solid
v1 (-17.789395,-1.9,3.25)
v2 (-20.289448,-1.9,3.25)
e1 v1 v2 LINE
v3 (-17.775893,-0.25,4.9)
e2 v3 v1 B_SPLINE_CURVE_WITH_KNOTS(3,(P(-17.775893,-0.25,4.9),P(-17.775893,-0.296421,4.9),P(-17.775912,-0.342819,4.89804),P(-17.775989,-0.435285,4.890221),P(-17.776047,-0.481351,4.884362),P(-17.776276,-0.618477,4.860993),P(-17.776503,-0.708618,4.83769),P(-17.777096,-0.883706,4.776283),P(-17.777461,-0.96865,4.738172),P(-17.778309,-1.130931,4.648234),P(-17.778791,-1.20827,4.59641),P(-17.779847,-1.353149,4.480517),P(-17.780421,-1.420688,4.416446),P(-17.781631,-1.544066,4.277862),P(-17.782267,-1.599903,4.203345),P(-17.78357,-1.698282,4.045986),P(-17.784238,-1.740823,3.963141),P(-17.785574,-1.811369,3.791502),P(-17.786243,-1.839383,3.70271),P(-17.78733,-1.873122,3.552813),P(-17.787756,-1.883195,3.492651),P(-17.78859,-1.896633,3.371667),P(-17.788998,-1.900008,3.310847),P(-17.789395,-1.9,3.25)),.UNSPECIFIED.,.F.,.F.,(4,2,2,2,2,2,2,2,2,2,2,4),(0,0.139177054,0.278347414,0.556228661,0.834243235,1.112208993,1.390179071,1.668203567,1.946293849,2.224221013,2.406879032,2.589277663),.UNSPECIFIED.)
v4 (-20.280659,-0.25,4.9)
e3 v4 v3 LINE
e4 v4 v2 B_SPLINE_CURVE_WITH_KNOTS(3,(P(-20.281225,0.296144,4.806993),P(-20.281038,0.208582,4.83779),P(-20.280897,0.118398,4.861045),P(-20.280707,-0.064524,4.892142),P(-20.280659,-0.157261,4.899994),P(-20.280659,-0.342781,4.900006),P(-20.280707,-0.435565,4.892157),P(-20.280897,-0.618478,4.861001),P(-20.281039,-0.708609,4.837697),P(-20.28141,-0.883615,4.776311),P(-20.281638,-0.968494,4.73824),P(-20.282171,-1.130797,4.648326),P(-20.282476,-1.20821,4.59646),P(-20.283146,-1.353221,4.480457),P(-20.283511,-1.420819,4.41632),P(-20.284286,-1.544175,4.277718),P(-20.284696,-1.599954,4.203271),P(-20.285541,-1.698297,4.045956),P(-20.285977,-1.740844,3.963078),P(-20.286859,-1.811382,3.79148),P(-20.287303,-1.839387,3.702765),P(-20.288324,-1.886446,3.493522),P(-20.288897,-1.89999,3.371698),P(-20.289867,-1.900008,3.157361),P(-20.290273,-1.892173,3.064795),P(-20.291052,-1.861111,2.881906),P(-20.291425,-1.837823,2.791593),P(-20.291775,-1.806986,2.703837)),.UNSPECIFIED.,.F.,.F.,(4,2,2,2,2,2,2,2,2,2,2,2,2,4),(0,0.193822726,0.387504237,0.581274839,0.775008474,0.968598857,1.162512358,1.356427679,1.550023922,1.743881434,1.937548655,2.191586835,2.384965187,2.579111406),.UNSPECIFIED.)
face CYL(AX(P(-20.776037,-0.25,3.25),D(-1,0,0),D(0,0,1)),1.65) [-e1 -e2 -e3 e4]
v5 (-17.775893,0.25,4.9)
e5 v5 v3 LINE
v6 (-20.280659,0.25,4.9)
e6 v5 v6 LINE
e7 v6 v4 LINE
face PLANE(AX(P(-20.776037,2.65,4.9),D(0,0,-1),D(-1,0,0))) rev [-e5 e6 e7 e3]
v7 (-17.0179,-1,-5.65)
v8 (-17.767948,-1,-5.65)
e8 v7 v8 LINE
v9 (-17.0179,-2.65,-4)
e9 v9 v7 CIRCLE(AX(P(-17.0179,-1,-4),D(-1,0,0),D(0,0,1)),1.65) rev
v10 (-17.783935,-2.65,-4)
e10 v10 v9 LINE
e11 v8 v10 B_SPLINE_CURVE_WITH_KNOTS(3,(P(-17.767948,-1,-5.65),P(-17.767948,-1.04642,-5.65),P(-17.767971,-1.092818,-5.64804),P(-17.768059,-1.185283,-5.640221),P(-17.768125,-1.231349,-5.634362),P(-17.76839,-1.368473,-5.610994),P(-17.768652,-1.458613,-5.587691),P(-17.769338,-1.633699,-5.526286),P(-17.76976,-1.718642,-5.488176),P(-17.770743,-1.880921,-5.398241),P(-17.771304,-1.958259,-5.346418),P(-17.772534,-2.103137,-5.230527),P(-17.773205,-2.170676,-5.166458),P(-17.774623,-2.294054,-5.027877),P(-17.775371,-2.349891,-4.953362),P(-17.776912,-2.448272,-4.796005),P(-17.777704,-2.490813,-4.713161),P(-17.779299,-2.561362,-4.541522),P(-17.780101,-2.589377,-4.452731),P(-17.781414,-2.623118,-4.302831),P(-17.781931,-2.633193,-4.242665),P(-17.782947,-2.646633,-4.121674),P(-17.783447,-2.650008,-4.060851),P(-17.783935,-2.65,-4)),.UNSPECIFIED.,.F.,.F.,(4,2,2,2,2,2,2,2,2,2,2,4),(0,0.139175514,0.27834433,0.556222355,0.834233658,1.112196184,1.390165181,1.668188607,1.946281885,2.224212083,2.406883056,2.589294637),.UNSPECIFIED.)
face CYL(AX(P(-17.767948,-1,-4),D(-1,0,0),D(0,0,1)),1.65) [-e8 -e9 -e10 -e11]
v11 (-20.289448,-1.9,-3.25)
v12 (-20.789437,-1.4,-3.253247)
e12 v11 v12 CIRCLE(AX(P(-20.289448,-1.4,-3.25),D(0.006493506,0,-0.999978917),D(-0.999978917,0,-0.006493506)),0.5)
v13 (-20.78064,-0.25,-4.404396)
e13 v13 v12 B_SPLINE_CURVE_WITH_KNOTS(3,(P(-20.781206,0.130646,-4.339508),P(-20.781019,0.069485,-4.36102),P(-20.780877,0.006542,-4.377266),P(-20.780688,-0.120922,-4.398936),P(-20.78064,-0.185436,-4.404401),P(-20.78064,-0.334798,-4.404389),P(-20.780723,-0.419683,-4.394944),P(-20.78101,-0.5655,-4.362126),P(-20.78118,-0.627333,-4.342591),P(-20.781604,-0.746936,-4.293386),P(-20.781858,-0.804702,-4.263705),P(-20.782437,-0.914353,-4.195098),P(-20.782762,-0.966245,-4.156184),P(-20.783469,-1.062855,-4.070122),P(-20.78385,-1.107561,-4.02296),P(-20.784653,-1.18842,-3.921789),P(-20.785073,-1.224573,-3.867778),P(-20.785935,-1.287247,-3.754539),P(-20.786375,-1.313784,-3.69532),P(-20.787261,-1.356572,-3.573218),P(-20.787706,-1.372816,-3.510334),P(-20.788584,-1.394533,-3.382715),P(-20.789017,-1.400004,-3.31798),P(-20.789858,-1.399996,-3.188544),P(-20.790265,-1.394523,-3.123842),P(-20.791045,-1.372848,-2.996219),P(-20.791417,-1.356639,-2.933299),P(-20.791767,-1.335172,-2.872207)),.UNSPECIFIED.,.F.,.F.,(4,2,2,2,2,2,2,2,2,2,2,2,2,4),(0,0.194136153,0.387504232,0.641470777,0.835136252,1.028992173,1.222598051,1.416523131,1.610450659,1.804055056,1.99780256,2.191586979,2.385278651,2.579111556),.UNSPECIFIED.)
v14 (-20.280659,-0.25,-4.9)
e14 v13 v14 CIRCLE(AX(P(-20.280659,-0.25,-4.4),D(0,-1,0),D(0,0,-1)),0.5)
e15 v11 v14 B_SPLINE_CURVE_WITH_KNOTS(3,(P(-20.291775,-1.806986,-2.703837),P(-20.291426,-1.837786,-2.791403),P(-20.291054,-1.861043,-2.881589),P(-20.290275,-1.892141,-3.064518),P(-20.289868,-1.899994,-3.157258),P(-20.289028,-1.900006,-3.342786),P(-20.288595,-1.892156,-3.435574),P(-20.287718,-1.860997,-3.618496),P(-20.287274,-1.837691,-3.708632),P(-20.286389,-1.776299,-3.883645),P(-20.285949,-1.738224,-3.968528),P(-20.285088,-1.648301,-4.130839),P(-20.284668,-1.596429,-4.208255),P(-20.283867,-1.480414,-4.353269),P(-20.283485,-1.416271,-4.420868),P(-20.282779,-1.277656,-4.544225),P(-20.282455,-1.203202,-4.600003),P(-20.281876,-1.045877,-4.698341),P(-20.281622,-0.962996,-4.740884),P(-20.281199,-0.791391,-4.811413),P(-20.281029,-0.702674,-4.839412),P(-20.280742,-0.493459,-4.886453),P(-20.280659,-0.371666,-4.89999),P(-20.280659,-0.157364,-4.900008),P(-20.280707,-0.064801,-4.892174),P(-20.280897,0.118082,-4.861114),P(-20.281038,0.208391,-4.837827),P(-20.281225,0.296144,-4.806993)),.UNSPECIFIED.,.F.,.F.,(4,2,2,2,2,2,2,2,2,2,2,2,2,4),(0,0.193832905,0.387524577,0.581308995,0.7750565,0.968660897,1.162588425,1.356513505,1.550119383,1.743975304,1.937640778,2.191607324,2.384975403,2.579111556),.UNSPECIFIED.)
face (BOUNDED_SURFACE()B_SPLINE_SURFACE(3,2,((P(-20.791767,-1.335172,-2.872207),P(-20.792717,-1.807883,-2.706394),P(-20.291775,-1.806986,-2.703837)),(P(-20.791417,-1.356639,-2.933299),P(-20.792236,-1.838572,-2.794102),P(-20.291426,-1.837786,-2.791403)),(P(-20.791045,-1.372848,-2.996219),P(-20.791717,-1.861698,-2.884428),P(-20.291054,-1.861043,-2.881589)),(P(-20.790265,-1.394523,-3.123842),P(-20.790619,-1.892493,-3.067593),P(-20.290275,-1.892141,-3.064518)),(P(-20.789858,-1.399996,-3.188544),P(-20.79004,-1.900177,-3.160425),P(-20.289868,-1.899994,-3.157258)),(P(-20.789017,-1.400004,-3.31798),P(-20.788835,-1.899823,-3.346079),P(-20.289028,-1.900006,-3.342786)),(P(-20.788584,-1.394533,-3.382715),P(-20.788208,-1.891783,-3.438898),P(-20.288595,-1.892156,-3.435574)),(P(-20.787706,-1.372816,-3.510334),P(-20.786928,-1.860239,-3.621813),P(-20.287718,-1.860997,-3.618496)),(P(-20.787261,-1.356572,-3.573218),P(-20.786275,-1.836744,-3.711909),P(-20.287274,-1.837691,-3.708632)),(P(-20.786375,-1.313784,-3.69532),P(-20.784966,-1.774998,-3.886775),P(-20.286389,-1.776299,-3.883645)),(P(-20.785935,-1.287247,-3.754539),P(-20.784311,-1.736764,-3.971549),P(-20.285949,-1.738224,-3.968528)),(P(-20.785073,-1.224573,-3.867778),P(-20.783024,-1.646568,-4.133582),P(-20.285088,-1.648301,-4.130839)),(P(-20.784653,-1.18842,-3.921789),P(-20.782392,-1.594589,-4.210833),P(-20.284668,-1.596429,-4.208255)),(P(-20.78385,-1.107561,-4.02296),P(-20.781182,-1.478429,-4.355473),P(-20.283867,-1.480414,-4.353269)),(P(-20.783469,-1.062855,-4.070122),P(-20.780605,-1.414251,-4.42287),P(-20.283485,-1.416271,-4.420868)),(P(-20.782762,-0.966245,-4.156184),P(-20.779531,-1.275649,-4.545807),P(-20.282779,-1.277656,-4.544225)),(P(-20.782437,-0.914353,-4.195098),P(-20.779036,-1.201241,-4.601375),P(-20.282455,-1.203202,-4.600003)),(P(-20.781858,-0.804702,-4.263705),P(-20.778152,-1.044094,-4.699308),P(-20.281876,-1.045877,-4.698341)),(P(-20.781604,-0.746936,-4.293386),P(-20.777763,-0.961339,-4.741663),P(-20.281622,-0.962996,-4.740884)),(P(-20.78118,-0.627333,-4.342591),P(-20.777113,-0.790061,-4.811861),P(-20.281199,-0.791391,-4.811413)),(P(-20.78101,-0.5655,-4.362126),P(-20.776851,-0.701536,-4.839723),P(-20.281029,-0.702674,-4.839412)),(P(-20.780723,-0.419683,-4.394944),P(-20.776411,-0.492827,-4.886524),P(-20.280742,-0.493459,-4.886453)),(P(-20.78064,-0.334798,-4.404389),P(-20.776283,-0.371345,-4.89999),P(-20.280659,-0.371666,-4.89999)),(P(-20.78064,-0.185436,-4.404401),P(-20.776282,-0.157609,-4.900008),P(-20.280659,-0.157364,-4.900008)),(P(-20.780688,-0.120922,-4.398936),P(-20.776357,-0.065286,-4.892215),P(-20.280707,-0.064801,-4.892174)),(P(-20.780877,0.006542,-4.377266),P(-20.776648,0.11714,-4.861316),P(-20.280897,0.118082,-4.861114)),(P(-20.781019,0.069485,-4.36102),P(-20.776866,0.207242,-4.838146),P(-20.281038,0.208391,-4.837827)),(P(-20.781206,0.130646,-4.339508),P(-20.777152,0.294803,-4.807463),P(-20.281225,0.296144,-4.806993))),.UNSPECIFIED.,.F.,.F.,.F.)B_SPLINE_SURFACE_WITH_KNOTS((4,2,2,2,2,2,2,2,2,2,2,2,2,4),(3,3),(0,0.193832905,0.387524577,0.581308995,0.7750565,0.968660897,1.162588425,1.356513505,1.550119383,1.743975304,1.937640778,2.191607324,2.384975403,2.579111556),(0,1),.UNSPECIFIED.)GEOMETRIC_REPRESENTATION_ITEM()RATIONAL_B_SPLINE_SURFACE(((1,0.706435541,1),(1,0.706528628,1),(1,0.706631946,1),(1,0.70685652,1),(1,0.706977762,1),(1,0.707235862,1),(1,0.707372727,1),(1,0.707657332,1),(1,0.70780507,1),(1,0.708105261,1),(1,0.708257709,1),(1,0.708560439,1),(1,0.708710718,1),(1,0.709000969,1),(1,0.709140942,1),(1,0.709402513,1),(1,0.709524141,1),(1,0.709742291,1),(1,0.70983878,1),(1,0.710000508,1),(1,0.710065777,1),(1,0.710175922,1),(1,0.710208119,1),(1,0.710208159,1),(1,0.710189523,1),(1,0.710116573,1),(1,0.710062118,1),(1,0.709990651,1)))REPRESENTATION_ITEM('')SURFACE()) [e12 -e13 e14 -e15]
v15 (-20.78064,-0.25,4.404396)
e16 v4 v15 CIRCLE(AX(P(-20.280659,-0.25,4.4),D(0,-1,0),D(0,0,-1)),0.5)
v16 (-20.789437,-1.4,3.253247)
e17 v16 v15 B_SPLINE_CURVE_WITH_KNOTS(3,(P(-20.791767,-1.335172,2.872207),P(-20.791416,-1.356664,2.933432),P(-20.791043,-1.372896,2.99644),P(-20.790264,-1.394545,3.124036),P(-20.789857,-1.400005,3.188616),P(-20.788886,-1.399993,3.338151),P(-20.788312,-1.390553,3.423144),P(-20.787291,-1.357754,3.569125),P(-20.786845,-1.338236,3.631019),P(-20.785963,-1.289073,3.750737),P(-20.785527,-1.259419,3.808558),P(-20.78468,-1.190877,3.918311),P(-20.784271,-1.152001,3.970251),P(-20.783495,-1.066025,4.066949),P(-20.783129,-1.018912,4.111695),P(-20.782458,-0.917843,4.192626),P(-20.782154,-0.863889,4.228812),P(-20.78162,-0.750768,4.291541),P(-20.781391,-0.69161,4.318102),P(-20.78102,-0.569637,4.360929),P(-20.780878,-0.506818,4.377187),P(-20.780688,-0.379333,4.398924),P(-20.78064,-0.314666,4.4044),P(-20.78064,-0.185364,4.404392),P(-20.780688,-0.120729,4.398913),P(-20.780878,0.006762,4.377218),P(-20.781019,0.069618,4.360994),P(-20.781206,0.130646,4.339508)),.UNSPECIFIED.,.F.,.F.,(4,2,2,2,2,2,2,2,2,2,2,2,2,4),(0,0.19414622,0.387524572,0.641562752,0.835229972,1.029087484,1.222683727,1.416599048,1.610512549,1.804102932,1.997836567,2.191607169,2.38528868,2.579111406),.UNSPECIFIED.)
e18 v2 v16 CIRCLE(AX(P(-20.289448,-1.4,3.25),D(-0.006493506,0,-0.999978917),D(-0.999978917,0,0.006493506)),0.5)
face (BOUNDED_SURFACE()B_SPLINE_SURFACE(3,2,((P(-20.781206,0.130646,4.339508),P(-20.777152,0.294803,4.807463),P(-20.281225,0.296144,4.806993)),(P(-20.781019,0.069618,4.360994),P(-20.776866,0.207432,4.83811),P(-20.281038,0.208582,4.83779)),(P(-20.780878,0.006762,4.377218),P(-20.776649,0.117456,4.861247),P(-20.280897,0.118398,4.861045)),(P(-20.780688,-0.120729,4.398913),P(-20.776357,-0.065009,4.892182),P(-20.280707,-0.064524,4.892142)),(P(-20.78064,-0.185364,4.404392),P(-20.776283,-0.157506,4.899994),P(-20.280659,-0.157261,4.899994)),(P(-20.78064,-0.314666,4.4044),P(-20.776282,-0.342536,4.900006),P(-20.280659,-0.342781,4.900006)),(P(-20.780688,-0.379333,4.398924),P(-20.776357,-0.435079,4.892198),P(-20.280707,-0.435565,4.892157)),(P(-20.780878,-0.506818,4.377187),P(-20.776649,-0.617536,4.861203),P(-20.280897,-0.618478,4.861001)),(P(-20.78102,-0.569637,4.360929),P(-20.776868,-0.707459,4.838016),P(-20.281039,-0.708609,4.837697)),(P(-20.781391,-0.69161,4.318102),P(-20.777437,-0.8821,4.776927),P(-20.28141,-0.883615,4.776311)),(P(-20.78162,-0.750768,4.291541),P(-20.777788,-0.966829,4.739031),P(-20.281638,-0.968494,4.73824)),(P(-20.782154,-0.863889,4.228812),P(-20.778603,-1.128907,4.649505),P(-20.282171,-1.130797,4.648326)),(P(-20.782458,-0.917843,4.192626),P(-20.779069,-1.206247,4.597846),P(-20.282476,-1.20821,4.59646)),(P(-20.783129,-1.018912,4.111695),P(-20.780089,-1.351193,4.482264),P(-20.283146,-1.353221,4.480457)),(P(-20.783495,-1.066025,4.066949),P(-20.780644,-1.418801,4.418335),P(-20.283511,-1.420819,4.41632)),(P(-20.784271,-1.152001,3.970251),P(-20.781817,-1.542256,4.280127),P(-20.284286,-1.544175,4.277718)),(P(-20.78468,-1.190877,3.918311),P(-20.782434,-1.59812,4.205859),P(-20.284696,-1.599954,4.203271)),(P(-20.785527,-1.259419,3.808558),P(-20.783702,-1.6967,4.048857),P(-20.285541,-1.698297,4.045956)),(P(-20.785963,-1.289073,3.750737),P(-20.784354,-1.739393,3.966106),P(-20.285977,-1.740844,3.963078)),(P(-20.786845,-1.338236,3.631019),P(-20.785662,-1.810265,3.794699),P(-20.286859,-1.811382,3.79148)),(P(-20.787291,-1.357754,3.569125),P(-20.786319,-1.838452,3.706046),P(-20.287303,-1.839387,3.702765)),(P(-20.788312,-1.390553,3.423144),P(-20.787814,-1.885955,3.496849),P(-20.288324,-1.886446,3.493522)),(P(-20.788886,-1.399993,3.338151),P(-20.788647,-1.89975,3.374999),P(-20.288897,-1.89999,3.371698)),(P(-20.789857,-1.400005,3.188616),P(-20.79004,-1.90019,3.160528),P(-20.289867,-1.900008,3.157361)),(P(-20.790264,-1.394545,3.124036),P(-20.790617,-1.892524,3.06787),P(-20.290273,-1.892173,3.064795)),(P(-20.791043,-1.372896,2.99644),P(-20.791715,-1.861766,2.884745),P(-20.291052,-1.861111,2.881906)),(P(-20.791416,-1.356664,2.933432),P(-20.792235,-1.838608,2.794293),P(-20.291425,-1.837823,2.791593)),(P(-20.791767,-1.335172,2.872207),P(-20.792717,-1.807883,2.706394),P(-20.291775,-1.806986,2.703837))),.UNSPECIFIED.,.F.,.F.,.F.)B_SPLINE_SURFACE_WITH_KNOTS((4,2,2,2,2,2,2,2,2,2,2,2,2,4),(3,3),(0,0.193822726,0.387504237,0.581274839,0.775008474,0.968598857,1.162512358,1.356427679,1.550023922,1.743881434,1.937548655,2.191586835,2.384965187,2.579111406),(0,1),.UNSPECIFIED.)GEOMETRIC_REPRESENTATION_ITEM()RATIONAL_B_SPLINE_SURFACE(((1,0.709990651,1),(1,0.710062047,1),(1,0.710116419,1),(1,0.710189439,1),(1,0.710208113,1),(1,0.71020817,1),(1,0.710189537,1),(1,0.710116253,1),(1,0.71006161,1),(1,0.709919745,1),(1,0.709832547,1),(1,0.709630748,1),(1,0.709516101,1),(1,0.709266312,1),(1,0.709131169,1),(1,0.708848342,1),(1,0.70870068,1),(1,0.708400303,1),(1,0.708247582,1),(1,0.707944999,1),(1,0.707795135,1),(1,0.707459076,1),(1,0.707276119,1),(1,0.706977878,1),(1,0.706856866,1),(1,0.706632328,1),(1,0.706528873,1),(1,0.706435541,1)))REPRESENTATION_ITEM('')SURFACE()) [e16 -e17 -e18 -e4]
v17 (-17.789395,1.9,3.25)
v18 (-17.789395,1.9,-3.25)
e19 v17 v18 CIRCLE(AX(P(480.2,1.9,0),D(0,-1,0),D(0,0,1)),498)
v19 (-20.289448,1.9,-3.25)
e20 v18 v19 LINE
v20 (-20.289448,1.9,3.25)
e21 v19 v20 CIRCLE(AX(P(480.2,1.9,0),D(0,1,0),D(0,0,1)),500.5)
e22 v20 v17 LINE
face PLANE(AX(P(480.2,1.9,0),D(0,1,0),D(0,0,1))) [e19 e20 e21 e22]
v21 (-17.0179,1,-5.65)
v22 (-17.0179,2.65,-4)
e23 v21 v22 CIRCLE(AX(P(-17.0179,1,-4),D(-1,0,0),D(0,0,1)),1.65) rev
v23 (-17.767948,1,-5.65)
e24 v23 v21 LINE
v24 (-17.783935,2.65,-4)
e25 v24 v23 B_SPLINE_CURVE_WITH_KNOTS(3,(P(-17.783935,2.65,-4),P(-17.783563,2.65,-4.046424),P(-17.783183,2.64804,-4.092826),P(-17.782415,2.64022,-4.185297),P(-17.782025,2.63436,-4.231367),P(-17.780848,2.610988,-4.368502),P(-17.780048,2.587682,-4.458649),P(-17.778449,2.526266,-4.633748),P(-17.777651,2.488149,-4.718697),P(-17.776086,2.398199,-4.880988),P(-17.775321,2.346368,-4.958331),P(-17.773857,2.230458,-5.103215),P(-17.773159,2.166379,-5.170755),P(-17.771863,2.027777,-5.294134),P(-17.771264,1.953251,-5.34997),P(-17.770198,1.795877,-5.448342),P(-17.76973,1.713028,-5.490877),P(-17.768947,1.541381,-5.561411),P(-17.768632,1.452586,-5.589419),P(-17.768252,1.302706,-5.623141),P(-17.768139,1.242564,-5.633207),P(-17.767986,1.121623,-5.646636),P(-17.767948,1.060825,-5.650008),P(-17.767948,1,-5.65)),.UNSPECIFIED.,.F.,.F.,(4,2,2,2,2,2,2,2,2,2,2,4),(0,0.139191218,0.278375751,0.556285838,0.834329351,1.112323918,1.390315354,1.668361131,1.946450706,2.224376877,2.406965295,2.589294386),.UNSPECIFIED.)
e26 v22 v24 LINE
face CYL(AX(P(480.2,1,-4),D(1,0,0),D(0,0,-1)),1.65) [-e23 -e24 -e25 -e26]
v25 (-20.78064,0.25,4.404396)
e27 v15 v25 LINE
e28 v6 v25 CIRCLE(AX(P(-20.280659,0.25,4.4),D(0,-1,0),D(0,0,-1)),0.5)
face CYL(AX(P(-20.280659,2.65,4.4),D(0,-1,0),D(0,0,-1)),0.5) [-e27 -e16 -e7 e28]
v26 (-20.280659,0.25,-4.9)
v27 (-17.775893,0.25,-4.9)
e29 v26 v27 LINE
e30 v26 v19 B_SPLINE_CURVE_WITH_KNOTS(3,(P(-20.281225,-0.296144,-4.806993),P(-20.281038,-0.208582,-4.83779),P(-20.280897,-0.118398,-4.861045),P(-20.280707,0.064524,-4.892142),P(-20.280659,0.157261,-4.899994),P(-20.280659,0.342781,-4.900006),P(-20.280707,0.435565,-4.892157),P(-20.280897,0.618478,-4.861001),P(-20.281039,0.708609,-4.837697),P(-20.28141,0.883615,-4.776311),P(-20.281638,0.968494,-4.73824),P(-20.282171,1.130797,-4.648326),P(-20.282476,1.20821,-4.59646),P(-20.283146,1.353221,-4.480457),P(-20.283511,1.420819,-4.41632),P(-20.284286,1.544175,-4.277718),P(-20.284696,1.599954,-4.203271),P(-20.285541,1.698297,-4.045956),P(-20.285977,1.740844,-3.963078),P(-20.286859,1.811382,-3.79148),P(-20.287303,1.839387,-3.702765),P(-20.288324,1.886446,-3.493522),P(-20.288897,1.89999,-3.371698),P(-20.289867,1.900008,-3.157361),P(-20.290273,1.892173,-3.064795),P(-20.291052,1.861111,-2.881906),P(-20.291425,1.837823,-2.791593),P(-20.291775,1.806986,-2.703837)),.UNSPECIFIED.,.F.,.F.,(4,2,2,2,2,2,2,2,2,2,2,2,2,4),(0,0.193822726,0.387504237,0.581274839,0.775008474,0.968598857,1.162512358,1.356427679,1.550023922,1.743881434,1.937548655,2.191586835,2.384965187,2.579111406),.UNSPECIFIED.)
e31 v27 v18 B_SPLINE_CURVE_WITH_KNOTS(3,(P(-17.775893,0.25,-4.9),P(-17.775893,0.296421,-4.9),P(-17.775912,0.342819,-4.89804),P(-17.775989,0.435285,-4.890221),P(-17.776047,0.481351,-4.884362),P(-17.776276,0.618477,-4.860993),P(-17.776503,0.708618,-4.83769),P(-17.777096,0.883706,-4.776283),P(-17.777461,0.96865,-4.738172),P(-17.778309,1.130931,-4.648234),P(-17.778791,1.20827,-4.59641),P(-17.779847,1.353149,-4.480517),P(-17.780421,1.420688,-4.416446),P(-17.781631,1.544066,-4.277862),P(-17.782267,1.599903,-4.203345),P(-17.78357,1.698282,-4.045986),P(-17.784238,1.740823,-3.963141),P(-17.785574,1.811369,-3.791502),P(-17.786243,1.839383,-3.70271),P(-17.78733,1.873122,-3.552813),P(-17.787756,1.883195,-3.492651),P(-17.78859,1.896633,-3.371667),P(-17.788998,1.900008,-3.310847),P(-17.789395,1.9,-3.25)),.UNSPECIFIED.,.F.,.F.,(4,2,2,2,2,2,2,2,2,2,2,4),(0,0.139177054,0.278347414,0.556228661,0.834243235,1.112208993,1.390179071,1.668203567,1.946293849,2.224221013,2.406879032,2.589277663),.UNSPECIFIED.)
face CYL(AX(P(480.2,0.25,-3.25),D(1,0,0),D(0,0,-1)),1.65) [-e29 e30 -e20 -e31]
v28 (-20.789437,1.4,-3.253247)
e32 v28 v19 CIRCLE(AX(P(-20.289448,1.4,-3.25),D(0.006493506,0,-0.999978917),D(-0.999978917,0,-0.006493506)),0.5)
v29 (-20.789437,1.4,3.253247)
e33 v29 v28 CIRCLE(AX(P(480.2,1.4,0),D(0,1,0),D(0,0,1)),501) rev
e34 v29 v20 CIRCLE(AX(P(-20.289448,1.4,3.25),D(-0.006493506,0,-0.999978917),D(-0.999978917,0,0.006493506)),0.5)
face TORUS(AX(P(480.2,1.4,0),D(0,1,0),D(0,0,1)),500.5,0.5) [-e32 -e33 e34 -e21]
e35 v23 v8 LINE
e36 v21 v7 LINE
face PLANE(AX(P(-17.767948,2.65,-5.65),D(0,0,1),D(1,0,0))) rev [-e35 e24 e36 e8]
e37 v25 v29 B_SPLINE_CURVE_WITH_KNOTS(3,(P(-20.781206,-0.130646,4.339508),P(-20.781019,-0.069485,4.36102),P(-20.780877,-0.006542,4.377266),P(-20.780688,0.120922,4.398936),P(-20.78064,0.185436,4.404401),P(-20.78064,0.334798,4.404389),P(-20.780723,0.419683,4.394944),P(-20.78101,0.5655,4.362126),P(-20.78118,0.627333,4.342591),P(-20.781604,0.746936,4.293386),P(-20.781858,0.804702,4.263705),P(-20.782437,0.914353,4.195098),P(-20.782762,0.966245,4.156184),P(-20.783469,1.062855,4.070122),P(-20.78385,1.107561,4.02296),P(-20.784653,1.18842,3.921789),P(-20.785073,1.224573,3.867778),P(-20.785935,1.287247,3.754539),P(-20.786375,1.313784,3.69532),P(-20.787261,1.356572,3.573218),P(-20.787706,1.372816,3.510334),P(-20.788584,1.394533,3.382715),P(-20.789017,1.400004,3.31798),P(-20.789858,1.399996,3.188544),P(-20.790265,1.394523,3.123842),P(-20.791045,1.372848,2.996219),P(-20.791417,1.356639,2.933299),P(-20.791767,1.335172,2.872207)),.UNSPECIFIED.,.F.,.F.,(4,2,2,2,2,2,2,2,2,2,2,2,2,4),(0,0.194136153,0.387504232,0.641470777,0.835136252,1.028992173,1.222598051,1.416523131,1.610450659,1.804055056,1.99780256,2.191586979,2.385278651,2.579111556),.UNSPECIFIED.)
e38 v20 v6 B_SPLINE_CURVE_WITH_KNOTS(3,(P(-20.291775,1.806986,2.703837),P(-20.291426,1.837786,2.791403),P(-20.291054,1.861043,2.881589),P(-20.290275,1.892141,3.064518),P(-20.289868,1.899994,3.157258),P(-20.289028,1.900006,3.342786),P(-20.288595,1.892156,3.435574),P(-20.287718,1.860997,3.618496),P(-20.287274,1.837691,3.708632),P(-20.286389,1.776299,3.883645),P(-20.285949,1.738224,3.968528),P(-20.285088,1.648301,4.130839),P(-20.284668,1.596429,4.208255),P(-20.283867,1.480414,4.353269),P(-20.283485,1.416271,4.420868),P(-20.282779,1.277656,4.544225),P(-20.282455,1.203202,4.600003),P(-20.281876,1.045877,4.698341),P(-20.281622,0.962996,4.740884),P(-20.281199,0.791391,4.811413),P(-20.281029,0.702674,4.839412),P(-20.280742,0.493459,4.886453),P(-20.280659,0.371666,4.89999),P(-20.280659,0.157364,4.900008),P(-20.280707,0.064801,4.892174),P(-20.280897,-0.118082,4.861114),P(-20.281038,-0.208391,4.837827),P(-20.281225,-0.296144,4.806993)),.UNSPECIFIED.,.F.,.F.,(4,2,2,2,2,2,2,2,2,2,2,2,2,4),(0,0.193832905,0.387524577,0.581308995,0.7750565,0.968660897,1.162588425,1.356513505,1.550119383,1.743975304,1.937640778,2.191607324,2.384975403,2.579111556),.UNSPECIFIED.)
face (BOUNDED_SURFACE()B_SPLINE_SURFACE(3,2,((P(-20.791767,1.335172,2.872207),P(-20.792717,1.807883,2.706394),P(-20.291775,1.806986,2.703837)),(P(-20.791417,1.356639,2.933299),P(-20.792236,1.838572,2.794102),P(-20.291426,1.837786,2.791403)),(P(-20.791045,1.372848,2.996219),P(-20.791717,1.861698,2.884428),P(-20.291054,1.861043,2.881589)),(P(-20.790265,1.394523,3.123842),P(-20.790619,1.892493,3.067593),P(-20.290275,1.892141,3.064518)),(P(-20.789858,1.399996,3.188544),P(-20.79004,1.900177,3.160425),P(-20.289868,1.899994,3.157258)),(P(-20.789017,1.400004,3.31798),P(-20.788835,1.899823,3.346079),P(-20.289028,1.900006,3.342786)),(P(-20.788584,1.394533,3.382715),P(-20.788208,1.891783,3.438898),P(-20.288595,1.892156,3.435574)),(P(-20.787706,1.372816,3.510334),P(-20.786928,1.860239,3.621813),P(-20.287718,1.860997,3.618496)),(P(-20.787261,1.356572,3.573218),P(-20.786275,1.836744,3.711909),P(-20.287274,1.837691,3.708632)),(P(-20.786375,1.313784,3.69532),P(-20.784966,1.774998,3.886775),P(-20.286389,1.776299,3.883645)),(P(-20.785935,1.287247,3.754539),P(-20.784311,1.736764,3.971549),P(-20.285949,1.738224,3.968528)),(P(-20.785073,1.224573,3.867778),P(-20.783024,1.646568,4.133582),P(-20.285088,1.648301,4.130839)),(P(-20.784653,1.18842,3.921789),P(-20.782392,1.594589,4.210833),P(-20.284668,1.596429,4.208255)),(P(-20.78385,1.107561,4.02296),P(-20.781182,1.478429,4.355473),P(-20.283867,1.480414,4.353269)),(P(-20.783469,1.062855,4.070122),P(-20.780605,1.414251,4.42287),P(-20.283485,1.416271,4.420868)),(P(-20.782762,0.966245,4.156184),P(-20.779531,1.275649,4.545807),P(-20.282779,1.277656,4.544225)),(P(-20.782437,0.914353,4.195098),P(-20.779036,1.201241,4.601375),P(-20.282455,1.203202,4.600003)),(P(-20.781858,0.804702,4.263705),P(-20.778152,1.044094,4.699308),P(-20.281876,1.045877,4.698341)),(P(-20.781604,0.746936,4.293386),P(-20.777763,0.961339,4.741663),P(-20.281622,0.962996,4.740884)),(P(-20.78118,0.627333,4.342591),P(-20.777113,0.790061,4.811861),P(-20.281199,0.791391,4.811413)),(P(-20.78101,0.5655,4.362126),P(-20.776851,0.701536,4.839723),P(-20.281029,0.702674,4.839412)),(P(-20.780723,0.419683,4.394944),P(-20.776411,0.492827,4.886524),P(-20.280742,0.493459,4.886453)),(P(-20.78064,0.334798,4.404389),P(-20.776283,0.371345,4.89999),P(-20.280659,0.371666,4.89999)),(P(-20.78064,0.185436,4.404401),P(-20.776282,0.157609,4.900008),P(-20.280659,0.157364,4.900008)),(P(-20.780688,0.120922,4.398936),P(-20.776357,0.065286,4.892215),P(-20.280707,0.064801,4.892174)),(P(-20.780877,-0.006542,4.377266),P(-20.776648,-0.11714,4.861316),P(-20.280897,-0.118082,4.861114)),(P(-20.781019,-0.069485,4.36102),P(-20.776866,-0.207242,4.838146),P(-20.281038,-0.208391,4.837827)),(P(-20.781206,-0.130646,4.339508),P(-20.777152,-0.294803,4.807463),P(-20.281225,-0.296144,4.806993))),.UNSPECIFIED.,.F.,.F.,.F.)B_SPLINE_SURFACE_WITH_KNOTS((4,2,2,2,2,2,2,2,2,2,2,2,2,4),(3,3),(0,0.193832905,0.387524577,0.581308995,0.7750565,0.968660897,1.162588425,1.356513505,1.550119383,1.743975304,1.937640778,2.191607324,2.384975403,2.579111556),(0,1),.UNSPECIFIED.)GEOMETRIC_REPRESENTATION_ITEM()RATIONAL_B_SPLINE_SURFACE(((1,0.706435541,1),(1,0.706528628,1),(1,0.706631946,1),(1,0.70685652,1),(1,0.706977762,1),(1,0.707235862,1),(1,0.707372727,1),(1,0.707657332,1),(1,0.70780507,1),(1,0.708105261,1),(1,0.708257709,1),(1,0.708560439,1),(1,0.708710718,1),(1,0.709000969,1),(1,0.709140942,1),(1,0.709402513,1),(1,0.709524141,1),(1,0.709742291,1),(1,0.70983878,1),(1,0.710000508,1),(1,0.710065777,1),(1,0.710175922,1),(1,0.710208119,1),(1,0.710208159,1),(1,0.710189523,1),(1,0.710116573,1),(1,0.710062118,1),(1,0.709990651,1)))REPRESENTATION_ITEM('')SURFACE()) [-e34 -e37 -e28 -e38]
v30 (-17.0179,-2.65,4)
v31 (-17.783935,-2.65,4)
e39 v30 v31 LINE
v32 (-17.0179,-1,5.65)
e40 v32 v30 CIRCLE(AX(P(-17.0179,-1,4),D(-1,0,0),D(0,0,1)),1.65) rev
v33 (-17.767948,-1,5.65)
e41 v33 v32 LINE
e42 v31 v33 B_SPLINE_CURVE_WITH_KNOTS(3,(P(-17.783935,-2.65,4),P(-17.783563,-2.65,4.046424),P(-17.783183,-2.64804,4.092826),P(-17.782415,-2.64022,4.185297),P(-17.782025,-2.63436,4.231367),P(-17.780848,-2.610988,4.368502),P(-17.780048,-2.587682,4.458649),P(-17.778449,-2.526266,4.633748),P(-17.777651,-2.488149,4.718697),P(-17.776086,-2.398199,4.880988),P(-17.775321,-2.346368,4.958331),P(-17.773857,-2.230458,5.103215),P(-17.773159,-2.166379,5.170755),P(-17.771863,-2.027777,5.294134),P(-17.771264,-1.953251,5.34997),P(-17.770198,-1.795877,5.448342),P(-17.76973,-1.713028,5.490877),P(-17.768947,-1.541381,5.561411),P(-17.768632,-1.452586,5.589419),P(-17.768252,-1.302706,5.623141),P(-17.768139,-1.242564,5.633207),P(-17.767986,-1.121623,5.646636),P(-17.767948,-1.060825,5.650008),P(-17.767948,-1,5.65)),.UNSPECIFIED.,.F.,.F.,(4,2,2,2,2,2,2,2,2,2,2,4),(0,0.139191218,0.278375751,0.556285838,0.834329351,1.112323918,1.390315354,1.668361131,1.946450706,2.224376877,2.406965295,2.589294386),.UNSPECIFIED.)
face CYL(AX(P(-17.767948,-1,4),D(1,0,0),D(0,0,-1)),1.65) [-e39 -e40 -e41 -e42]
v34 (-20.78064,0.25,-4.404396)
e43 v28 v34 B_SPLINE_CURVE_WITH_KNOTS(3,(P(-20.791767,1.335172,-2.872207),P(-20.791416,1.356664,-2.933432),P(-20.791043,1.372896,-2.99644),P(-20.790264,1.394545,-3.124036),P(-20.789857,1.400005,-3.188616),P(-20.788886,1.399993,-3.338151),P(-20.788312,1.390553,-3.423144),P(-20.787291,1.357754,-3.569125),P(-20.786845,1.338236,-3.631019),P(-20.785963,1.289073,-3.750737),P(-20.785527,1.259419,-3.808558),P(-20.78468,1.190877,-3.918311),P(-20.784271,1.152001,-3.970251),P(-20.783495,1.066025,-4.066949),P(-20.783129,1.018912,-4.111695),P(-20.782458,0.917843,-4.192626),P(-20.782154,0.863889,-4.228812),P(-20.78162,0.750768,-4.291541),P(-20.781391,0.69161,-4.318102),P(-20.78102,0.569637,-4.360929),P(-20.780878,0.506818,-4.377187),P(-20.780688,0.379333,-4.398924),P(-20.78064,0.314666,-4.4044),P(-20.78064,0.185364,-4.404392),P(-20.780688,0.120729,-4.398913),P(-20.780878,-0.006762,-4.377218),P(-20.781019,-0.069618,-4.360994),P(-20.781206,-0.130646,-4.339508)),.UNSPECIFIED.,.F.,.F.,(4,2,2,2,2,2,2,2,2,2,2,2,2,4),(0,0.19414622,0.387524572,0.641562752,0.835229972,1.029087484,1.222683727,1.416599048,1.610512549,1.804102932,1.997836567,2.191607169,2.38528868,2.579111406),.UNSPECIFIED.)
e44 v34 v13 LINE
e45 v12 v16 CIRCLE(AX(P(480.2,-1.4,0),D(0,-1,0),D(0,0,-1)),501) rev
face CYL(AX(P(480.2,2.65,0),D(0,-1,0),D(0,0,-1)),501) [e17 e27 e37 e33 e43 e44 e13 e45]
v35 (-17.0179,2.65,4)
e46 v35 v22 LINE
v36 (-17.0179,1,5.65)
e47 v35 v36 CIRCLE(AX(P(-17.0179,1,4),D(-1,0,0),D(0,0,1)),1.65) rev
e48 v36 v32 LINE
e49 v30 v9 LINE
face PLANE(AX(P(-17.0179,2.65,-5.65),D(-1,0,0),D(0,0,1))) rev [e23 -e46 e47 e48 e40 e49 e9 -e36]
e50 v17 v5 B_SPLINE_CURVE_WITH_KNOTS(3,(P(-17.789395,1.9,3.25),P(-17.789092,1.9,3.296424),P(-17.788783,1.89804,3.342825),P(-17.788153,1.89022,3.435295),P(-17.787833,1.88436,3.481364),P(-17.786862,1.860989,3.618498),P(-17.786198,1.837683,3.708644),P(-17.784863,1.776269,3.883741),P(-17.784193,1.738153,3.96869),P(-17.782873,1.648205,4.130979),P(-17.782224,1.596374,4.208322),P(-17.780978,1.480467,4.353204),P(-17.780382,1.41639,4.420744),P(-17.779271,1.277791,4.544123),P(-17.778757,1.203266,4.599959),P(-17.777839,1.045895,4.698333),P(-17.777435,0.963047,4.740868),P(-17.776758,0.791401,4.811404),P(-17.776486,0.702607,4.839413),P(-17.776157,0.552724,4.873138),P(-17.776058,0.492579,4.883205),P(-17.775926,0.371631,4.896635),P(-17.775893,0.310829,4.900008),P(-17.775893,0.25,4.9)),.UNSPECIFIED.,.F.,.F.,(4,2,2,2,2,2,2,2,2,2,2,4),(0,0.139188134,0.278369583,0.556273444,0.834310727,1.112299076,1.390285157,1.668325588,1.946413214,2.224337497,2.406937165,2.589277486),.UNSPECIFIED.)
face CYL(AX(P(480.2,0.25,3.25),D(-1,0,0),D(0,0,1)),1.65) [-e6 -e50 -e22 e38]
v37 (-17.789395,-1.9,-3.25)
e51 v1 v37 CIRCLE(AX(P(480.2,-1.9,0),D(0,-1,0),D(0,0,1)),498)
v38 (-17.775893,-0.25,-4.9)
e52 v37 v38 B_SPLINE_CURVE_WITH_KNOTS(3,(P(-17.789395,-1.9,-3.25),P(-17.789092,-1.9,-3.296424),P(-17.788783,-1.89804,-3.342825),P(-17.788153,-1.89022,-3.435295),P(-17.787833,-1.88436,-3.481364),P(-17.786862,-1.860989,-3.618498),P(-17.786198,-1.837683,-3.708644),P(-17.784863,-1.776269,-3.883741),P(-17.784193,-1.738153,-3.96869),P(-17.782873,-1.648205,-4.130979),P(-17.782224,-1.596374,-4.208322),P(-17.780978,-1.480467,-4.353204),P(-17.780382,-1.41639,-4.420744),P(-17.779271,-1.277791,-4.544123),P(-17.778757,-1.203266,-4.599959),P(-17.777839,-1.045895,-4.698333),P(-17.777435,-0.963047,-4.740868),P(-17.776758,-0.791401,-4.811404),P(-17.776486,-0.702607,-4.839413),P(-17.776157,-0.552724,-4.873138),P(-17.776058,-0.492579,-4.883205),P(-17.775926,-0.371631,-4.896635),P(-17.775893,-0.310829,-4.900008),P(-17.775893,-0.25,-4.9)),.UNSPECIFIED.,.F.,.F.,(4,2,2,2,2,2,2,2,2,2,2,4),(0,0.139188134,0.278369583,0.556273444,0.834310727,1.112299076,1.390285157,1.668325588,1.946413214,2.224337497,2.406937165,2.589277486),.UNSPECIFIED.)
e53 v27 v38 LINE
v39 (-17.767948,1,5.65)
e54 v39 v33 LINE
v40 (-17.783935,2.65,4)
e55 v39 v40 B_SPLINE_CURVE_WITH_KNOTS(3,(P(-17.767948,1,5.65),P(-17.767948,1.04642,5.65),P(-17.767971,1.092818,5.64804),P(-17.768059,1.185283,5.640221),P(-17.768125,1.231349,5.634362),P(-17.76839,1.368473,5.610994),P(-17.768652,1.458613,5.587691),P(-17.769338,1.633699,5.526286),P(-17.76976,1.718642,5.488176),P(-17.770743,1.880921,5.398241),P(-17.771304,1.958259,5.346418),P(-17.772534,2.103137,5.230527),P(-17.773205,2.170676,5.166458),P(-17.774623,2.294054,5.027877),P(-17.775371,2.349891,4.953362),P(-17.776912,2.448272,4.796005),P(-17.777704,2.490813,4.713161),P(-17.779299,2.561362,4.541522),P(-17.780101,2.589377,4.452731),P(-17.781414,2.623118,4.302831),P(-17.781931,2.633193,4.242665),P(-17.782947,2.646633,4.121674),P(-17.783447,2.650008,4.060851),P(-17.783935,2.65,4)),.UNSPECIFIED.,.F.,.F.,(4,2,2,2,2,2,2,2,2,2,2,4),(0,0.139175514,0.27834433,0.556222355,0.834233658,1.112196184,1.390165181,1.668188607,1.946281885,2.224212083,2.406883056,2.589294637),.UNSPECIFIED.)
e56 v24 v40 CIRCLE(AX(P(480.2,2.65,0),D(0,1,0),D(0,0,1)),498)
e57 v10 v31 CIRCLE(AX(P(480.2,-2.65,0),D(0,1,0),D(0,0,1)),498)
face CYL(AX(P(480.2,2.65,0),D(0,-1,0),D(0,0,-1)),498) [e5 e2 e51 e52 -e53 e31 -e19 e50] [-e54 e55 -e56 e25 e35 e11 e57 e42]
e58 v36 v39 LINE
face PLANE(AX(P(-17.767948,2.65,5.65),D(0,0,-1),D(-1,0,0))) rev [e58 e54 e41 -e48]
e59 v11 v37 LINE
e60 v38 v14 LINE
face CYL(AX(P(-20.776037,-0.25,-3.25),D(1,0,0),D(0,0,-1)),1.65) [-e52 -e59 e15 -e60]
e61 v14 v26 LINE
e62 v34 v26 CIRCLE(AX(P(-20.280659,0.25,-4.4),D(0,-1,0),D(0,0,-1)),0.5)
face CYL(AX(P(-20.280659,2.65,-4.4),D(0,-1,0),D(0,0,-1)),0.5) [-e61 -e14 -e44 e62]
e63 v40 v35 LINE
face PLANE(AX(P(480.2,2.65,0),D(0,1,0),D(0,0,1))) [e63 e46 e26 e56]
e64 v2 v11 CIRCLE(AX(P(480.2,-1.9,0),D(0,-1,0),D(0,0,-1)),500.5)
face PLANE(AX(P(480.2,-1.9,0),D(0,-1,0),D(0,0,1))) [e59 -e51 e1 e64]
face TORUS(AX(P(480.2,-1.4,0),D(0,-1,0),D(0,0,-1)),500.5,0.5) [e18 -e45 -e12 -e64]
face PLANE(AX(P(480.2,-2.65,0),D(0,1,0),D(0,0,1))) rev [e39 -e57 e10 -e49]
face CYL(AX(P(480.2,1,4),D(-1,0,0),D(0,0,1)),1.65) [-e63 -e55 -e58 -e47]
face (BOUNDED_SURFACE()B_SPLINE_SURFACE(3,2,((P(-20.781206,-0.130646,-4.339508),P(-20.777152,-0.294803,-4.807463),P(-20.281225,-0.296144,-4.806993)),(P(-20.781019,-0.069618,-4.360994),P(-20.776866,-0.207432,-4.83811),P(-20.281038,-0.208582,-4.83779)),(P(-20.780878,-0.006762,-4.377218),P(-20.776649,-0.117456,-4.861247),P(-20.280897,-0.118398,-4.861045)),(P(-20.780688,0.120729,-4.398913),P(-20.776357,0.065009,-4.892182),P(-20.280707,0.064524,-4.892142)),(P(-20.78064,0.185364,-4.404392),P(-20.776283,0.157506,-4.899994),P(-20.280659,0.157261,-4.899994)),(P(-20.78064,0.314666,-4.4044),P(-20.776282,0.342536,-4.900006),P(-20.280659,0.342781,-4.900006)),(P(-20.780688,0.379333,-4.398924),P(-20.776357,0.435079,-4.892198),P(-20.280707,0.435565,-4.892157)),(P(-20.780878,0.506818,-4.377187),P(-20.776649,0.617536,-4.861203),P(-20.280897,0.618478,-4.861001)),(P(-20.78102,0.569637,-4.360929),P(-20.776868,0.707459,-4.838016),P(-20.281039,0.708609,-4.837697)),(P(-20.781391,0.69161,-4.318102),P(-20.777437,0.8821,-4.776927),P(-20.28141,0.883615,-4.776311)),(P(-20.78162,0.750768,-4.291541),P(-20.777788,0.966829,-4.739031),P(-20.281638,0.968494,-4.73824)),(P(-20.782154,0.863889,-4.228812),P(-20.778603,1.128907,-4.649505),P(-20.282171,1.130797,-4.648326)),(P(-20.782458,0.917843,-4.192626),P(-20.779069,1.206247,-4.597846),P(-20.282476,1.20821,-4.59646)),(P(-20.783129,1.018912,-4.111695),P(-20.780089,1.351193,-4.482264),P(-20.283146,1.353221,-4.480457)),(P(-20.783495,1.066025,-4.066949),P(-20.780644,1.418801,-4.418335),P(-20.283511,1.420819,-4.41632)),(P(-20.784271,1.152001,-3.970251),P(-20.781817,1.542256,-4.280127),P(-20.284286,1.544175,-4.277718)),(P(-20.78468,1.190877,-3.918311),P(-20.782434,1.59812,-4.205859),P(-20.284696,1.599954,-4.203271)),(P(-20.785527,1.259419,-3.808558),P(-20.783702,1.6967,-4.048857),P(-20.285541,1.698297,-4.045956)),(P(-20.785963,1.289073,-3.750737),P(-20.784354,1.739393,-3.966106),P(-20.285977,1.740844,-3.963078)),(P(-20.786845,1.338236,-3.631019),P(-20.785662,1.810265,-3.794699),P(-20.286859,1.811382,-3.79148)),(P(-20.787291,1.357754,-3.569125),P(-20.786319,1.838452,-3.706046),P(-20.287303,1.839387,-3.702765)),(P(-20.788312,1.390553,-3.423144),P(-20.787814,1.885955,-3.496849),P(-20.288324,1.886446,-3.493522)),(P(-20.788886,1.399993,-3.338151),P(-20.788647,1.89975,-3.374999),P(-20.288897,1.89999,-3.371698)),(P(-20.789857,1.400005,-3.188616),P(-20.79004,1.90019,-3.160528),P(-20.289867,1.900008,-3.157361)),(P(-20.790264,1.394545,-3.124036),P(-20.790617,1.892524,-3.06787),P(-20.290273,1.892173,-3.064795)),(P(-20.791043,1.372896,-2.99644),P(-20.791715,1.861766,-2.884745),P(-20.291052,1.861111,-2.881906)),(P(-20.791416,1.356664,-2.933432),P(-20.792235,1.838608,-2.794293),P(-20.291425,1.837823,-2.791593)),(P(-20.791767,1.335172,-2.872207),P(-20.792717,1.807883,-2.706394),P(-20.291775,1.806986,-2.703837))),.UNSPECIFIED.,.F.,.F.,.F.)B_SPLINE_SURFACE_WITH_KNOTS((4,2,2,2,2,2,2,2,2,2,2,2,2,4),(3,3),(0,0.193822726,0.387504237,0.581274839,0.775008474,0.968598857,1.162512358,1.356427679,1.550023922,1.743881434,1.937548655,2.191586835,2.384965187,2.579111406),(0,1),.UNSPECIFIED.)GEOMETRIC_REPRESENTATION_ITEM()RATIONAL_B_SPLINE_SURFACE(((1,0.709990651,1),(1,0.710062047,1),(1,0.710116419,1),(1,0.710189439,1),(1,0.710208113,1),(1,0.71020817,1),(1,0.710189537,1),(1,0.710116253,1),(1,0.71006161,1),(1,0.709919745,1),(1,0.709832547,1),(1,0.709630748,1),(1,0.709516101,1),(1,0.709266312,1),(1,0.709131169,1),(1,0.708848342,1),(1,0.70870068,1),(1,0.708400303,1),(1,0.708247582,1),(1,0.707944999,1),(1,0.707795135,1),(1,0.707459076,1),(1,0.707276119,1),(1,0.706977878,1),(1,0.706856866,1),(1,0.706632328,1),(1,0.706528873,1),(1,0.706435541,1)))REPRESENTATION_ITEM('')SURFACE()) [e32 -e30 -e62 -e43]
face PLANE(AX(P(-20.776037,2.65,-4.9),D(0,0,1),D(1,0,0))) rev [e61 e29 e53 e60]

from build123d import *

# Parameters (mm, degrees)
BOSS_EXTRUDE1_DEPTH = 2.65
CUT_EXTRUDE2_DEPTH  = 0.75
FILLET3_R           = 1.65
FILLET4_R           = 0.5


with BuildPart() as part:
    # Sketch1 → Boss-Extrude1 (new, symmetric)
    with BuildSketch(Plane(origin=(0, 0, 0), x_dir=(1, 0, 0), z_dir=(0, 1, 0))):
        with BuildLine():
            Line((-20.776037351, 4.9), (-17.775892991, 4.9))
            ThreePointArc((-17.775892991, 4.9), (-17.772061826, 5.275001496), (-17.767948266, 5.65))
            Line((-17.767948266, 5.65), (-17.017899919, 5.65))
            Line((-17.017899919, 5.65), (-17.017899919, -5.65))
            Line((-17.017899919, -5.65), (-17.767948266, -5.65))
            ThreePointArc((-17.767948266, -5.65), (-17.772061826, -5.275001496), (-17.775892991, -4.9))
            Line((-17.775892991, -4.9), (-20.776037351, -4.9))
            ThreePointArc((-20.776037351, -4.9), (-20.8, 0), (-20.776037351, 4.9))
        make_face()
    extrude(amount=BOSS_EXTRUDE1_DEPTH, both=True)

    # Sketch2 → Cut-Extrude2 (cut)
    with BuildSketch(Plane(origin=(0, 2.65, 0), x_dir=(1, 0, 0), z_dir=(0, 1, 0))):
        with BuildLine():
            Line((-17.775892991, 4.9), (-20.776037348, 4.9))
            ThreePointArc((-20.776037348, 4.9), (-20.799999997, 0), (-20.776037348, -4.9))
            Line((-20.776037348, -4.9), (-17.775892991, -4.9))
            ThreePointArc((-17.775892991, -4.9), (-17.8, 0), (-17.775892991, 4.9))
        make_face()
    cut_extrude2 = extrude(amount=-CUT_EXTRUDE2_DEPTH, mode=Mode.SUBTRACT)

    # Mirror1: Cut-Extrude2 across plane
    add(cut_extrude2.mirror(Plane.ZX), mode=Mode.SUBTRACT)

    # Fillet3
    # the kernel refuses this fillet: 1.65 mm, written as the material it takes off along each edge
    with BuildSketch(Plane(origin=(-17.017899919, 2.65, 5.65), x_dir=(0, 0, -1), z_dir=(-1, 0, 0))) as fillet3_piece_1_section:
        with BuildLine():
            CenterArc((FILLET3_R, FILLET3_R), FILLET3_R, 180, 90)
            Line((0, FILLET3_R), (-FILLET3_R * 0.02, FILLET3_R))
            Line((-FILLET3_R * 0.02, FILLET3_R), (-FILLET3_R * 0.02, -FILLET3_R * 0.02))
            Line((-FILLET3_R * 0.02, -FILLET3_R * 0.02), (FILLET3_R, -FILLET3_R * 0.02))
            Line((FILLET3_R, -FILLET3_R * 0.02), (FILLET3_R, 0))
        make_face()
    fillet3_piece_1 = extrude(amount=4.875048347, mode=Mode.PRIVATE)
    fillet3_piece_1 = fillet3_piece_1 & Plane(origin=(480.200000514, 2.277476363, -5e-09), x_dir=(-0.9999356390878598, 0, 0.011345381525254326), z_dir=(0, 1, 0)) * Cylinder(498.000000514, 17, mode=Mode.PRIVATE)
    add(fillet3_piece_1, mode=Mode.SUBTRACT)
    with BuildSketch(Plane(origin=(-21.892948266, 2.65, -5.65), x_dir=(0, -1, 0), z_dir=(1, 0, 0))) as fillet3_piece_2_section:
        with BuildLine():
            CenterArc((FILLET3_R, -FILLET3_R), FILLET3_R, 90, 90)
            Line((0, -FILLET3_R), (-FILLET3_R * 0.02, -FILLET3_R))
            Line((-FILLET3_R * 0.02, -FILLET3_R), (-FILLET3_R * 0.02, FILLET3_R * 0.02))
            Line((-FILLET3_R * 0.02, FILLET3_R * 0.02), (FILLET3_R, FILLET3_R * 0.02))
            Line((FILLET3_R, FILLET3_R * 0.02), (FILLET3_R, 0))
        make_face()
    fillet3_piece_2 = extrude(amount=4.875048347, mode=Mode.PRIVATE)
    fillet3_piece_2 = fillet3_piece_2 & Plane(origin=(480.200000325, 2.277476179, 3e-09), x_dir=(-0.9999515923510308, 0, -0.009839357430136753), z_dir=(0, 1, 0)) * Cylinder(498.000000325, 17, mode=Mode.PRIVATE)
    add(fillet3_piece_2, mode=Mode.SUBTRACT)
    with BuildSketch(Plane(origin=(-24.901037348, 1.9, 4.9), x_dir=(0, 0, -1), z_dir=(1, 0, 0))) as fillet3_piece_3_section:
        with BuildLine():
            CenterArc((FILLET3_R, -FILLET3_R), FILLET3_R, 90, 90)
            Line((0, -FILLET3_R), (-FILLET3_R * 0.02, -FILLET3_R))
            Line((-FILLET3_R * 0.02, -FILLET3_R), (-FILLET3_R * 0.02, FILLET3_R * 0.02))
            Line((-FILLET3_R * 0.02, FILLET3_R * 0.02), (FILLET3_R, FILLET3_R * 0.02))
            Line((FILLET3_R, FILLET3_R * 0.02), (FILLET3_R, 0))
        make_face()
    fillet3_piece_3 = extrude(amount=11.250144357, mode=Mode.PRIVATE)
    fillet3_piece_3 = fillet3_piece_3 & Plane(origin=(480.2, 1.526447117, 0), x_dir=(-0.9999521703614557, 0, 0.009780439121757674), z_dir=(0, 1, 0)) * Cylinder(501, 30, mode=Mode.PRIVATE)
    fillet3_piece_3 = fillet3_piece_3 - Plane(origin=(480.200000004, 1.526447117, 0), x_dir=(-0.9999515923510358, 0, 0.009839357429633357), z_dir=(0, 1, 0)) * Cylinder(498.000000004, 30, mode=Mode.PRIVATE)
    add(fillet3_piece_3, mode=Mode.SUBTRACT)
    with BuildSketch(Plane(origin=(-13.650892991, 1.9, -4.9), x_dir=(0, -1, 0), z_dir=(-1, 0, 0))) as fillet3_piece_4_section:
        with BuildLine():
            CenterArc((FILLET3_R, FILLET3_R), FILLET3_R, 180, 90)
            Line((0, FILLET3_R), (-FILLET3_R * 0.02, FILLET3_R))
            Line((-FILLET3_R * 0.02, FILLET3_R), (-FILLET3_R * 0.02, -FILLET3_R * 0.02))
            Line((-FILLET3_R * 0.02, -FILLET3_R * 0.02), (FILLET3_R, -FILLET3_R * 0.02))
            Line((FILLET3_R, -FILLET3_R * 0.02), (FILLET3_R, 0))
        make_face()
    fillet3_piece_4 = extrude(amount=11.250144357, mode=Mode.PRIVATE)
    fillet3_piece_4 = fillet3_piece_4 & Plane(origin=(480.2, 1.526445495, 0), x_dir=(-0.9999521703614557, 0, 0.009780439121757674), z_dir=(0, 1, 0)) * Cylinder(501, 30, mode=Mode.PRIVATE)
    fillet3_piece_4 = fillet3_piece_4 - Plane(origin=(480.200000325, 1.526445495, 3e-09), x_dir=(-0.9999515923510308, 0, -0.009839357430136753), z_dir=(0, 1, 0)) * Cylinder(498.000000325, 30, mode=Mode.PRIVATE)
    add(fillet3_piece_4, mode=Mode.SUBTRACT)
    with BuildSketch(Plane(origin=(-13.650892991, -1.9, -4.9), x_dir=(0, 1, 0), z_dir=(-1, 0, 0))) as fillet3_piece_5_section:
        with BuildLine():
            CenterArc((FILLET3_R, -FILLET3_R), FILLET3_R, 90, 90)
            Line((0, -FILLET3_R), (-FILLET3_R * 0.02, -FILLET3_R))
            Line((-FILLET3_R * 0.02, -FILLET3_R), (-FILLET3_R * 0.02, FILLET3_R * 0.02))
            Line((-FILLET3_R * 0.02, FILLET3_R * 0.02), (FILLET3_R, FILLET3_R * 0.02))
            Line((FILLET3_R, FILLET3_R * 0.02), (FILLET3_R, 0))
        make_face()
    fillet3_piece_5 = extrude(amount=11.250144357, mode=Mode.PRIVATE)
    fillet3_piece_5 = fillet3_piece_5 & Plane(origin=(480.2, -1.526445495, 0), x_dir=(-0.9999521703614557, 0, 0.009780439121757674), z_dir=(0, 1, 0)) * Cylinder(501, 30, mode=Mode.PRIVATE)
    fillet3_piece_5 = fillet3_piece_5 - Plane(origin=(480.200000325, -1.526445495, 3e-09), x_dir=(-0.9999515923510308, 0, -0.009839357430136753), z_dir=(0, 1, 0)) * Cylinder(498.000000325, 30, mode=Mode.PRIVATE)
    add(fillet3_piece_5, mode=Mode.SUBTRACT)
    with BuildSketch(Plane(origin=(-24.901037348, -1.9, 4.9), x_dir=(0, 0, -1), z_dir=(1, 0, 0))) as fillet3_piece_6_section:
        with BuildLine():
            CenterArc((FILLET3_R, FILLET3_R), FILLET3_R, 180, 90)
            Line((0, FILLET3_R), (-FILLET3_R * 0.02, FILLET3_R))
            Line((-FILLET3_R * 0.02, FILLET3_R), (-FILLET3_R * 0.02, -FILLET3_R * 0.02))
            Line((-FILLET3_R * 0.02, -FILLET3_R * 0.02), (FILLET3_R, -FILLET3_R * 0.02))
            Line((FILLET3_R, -FILLET3_R * 0.02), (FILLET3_R, 0))
        make_face()
    fillet3_piece_6 = extrude(amount=11.250144357, mode=Mode.PRIVATE)
    fillet3_piece_6 = fillet3_piece_6 & Plane(origin=(480.2, -1.526447117, 0), x_dir=(-0.9999521703614557, 0, 0.009780439121757674), z_dir=(0, 1, 0)) * Cylinder(501, 30, mode=Mode.PRIVATE)
    fillet3_piece_6 = fillet3_piece_6 - Plane(origin=(480.200000004, -1.526447117, 0), x_dir=(-0.9999515923510358, 0, 0.009839357429633357), z_dir=(0, -1, 0)) * Cylinder(498.000000004, 30, mode=Mode.PRIVATE)
    add(fillet3_piece_6, mode=Mode.SUBTRACT)
    with BuildSketch(Plane(origin=(-21.892948266, -2.65, -5.65), x_dir=(0, 0, 1), z_dir=(1, 0, 0))) as fillet3_piece_7_section:
        with BuildLine():
            CenterArc((FILLET3_R, -FILLET3_R), FILLET3_R, 90, 90)
            Line((0, -FILLET3_R), (-FILLET3_R * 0.02, -FILLET3_R))
            Line((-FILLET3_R * 0.02, -FILLET3_R), (-FILLET3_R * 0.02, FILLET3_R * 0.02))
            Line((-FILLET3_R * 0.02, FILLET3_R * 0.02), (FILLET3_R, FILLET3_R * 0.02))
            Line((FILLET3_R, FILLET3_R * 0.02), (FILLET3_R, 0))
        make_face()
    fillet3_piece_7 = extrude(amount=4.875048347, mode=Mode.PRIVATE)
    fillet3_piece_7 = fillet3_piece_7 & Plane(origin=(480.200000325, -2.27747614, 3e-09), x_dir=(-0.9999515923510308, 0, -0.009839357430136753), z_dir=(0, 1, 0)) * Cylinder(498.000000325, 17, mode=Mode.PRIVATE)
    add(fillet3_piece_7, mode=Mode.SUBTRACT)
    with BuildSketch(Plane(origin=(-17.017899919, -2.65, 5.65), x_dir=(0, 0, -1), z_dir=(-1, 0, 0))) as fillet3_piece_8_section:
        with BuildLine():
            CenterArc((FILLET3_R, -FILLET3_R), FILLET3_R, 90, 90)
            Line((0, -FILLET3_R), (-FILLET3_R * 0.02, -FILLET3_R))
            Line((-FILLET3_R * 0.02, -FILLET3_R), (-FILLET3_R * 0.02, FILLET3_R * 0.02))
            Line((-FILLET3_R * 0.02, FILLET3_R * 0.02), (FILLET3_R, FILLET3_R * 0.02))
            Line((FILLET3_R, FILLET3_R * 0.02), (FILLET3_R, 0))
        make_face()
    fillet3_piece_8 = extrude(amount=4.875048347, mode=Mode.PRIVATE)
    fillet3_piece_8 = fillet3_piece_8 & Plane(origin=(480.200000514, -2.277476363, -5e-09), x_dir=(-0.9999356390878598, 0, 0.011345381525254326), z_dir=(0, 1, 0)) * Cylinder(498.000000514, 17, mode=Mode.PRIVATE)
    add(fillet3_piece_8, mode=Mode.SUBTRACT)

    # Fillet4
    fillet4_edges = [part.edges().sort_by_distance(p)[0] for p in [
        (-20.776037351, 0, 4.9),
        (-20.799999997, -1.9, 0),
        (-20.799999997, 1.9, 0),
        (-20.776037351, 0, -4.9),
        (-20.780531146, -1.416733553, -4.416718844),
        (-20.780531153, 1.416733542, -4.416718836),
        (-20.780531153, 1.416733544, 4.416718836),
        (-20.780531146, -1.416733553, 4.416718845),
    ]]
    fillet(fillet4_edges, radius=FILLET4_R)


solid = part.part
